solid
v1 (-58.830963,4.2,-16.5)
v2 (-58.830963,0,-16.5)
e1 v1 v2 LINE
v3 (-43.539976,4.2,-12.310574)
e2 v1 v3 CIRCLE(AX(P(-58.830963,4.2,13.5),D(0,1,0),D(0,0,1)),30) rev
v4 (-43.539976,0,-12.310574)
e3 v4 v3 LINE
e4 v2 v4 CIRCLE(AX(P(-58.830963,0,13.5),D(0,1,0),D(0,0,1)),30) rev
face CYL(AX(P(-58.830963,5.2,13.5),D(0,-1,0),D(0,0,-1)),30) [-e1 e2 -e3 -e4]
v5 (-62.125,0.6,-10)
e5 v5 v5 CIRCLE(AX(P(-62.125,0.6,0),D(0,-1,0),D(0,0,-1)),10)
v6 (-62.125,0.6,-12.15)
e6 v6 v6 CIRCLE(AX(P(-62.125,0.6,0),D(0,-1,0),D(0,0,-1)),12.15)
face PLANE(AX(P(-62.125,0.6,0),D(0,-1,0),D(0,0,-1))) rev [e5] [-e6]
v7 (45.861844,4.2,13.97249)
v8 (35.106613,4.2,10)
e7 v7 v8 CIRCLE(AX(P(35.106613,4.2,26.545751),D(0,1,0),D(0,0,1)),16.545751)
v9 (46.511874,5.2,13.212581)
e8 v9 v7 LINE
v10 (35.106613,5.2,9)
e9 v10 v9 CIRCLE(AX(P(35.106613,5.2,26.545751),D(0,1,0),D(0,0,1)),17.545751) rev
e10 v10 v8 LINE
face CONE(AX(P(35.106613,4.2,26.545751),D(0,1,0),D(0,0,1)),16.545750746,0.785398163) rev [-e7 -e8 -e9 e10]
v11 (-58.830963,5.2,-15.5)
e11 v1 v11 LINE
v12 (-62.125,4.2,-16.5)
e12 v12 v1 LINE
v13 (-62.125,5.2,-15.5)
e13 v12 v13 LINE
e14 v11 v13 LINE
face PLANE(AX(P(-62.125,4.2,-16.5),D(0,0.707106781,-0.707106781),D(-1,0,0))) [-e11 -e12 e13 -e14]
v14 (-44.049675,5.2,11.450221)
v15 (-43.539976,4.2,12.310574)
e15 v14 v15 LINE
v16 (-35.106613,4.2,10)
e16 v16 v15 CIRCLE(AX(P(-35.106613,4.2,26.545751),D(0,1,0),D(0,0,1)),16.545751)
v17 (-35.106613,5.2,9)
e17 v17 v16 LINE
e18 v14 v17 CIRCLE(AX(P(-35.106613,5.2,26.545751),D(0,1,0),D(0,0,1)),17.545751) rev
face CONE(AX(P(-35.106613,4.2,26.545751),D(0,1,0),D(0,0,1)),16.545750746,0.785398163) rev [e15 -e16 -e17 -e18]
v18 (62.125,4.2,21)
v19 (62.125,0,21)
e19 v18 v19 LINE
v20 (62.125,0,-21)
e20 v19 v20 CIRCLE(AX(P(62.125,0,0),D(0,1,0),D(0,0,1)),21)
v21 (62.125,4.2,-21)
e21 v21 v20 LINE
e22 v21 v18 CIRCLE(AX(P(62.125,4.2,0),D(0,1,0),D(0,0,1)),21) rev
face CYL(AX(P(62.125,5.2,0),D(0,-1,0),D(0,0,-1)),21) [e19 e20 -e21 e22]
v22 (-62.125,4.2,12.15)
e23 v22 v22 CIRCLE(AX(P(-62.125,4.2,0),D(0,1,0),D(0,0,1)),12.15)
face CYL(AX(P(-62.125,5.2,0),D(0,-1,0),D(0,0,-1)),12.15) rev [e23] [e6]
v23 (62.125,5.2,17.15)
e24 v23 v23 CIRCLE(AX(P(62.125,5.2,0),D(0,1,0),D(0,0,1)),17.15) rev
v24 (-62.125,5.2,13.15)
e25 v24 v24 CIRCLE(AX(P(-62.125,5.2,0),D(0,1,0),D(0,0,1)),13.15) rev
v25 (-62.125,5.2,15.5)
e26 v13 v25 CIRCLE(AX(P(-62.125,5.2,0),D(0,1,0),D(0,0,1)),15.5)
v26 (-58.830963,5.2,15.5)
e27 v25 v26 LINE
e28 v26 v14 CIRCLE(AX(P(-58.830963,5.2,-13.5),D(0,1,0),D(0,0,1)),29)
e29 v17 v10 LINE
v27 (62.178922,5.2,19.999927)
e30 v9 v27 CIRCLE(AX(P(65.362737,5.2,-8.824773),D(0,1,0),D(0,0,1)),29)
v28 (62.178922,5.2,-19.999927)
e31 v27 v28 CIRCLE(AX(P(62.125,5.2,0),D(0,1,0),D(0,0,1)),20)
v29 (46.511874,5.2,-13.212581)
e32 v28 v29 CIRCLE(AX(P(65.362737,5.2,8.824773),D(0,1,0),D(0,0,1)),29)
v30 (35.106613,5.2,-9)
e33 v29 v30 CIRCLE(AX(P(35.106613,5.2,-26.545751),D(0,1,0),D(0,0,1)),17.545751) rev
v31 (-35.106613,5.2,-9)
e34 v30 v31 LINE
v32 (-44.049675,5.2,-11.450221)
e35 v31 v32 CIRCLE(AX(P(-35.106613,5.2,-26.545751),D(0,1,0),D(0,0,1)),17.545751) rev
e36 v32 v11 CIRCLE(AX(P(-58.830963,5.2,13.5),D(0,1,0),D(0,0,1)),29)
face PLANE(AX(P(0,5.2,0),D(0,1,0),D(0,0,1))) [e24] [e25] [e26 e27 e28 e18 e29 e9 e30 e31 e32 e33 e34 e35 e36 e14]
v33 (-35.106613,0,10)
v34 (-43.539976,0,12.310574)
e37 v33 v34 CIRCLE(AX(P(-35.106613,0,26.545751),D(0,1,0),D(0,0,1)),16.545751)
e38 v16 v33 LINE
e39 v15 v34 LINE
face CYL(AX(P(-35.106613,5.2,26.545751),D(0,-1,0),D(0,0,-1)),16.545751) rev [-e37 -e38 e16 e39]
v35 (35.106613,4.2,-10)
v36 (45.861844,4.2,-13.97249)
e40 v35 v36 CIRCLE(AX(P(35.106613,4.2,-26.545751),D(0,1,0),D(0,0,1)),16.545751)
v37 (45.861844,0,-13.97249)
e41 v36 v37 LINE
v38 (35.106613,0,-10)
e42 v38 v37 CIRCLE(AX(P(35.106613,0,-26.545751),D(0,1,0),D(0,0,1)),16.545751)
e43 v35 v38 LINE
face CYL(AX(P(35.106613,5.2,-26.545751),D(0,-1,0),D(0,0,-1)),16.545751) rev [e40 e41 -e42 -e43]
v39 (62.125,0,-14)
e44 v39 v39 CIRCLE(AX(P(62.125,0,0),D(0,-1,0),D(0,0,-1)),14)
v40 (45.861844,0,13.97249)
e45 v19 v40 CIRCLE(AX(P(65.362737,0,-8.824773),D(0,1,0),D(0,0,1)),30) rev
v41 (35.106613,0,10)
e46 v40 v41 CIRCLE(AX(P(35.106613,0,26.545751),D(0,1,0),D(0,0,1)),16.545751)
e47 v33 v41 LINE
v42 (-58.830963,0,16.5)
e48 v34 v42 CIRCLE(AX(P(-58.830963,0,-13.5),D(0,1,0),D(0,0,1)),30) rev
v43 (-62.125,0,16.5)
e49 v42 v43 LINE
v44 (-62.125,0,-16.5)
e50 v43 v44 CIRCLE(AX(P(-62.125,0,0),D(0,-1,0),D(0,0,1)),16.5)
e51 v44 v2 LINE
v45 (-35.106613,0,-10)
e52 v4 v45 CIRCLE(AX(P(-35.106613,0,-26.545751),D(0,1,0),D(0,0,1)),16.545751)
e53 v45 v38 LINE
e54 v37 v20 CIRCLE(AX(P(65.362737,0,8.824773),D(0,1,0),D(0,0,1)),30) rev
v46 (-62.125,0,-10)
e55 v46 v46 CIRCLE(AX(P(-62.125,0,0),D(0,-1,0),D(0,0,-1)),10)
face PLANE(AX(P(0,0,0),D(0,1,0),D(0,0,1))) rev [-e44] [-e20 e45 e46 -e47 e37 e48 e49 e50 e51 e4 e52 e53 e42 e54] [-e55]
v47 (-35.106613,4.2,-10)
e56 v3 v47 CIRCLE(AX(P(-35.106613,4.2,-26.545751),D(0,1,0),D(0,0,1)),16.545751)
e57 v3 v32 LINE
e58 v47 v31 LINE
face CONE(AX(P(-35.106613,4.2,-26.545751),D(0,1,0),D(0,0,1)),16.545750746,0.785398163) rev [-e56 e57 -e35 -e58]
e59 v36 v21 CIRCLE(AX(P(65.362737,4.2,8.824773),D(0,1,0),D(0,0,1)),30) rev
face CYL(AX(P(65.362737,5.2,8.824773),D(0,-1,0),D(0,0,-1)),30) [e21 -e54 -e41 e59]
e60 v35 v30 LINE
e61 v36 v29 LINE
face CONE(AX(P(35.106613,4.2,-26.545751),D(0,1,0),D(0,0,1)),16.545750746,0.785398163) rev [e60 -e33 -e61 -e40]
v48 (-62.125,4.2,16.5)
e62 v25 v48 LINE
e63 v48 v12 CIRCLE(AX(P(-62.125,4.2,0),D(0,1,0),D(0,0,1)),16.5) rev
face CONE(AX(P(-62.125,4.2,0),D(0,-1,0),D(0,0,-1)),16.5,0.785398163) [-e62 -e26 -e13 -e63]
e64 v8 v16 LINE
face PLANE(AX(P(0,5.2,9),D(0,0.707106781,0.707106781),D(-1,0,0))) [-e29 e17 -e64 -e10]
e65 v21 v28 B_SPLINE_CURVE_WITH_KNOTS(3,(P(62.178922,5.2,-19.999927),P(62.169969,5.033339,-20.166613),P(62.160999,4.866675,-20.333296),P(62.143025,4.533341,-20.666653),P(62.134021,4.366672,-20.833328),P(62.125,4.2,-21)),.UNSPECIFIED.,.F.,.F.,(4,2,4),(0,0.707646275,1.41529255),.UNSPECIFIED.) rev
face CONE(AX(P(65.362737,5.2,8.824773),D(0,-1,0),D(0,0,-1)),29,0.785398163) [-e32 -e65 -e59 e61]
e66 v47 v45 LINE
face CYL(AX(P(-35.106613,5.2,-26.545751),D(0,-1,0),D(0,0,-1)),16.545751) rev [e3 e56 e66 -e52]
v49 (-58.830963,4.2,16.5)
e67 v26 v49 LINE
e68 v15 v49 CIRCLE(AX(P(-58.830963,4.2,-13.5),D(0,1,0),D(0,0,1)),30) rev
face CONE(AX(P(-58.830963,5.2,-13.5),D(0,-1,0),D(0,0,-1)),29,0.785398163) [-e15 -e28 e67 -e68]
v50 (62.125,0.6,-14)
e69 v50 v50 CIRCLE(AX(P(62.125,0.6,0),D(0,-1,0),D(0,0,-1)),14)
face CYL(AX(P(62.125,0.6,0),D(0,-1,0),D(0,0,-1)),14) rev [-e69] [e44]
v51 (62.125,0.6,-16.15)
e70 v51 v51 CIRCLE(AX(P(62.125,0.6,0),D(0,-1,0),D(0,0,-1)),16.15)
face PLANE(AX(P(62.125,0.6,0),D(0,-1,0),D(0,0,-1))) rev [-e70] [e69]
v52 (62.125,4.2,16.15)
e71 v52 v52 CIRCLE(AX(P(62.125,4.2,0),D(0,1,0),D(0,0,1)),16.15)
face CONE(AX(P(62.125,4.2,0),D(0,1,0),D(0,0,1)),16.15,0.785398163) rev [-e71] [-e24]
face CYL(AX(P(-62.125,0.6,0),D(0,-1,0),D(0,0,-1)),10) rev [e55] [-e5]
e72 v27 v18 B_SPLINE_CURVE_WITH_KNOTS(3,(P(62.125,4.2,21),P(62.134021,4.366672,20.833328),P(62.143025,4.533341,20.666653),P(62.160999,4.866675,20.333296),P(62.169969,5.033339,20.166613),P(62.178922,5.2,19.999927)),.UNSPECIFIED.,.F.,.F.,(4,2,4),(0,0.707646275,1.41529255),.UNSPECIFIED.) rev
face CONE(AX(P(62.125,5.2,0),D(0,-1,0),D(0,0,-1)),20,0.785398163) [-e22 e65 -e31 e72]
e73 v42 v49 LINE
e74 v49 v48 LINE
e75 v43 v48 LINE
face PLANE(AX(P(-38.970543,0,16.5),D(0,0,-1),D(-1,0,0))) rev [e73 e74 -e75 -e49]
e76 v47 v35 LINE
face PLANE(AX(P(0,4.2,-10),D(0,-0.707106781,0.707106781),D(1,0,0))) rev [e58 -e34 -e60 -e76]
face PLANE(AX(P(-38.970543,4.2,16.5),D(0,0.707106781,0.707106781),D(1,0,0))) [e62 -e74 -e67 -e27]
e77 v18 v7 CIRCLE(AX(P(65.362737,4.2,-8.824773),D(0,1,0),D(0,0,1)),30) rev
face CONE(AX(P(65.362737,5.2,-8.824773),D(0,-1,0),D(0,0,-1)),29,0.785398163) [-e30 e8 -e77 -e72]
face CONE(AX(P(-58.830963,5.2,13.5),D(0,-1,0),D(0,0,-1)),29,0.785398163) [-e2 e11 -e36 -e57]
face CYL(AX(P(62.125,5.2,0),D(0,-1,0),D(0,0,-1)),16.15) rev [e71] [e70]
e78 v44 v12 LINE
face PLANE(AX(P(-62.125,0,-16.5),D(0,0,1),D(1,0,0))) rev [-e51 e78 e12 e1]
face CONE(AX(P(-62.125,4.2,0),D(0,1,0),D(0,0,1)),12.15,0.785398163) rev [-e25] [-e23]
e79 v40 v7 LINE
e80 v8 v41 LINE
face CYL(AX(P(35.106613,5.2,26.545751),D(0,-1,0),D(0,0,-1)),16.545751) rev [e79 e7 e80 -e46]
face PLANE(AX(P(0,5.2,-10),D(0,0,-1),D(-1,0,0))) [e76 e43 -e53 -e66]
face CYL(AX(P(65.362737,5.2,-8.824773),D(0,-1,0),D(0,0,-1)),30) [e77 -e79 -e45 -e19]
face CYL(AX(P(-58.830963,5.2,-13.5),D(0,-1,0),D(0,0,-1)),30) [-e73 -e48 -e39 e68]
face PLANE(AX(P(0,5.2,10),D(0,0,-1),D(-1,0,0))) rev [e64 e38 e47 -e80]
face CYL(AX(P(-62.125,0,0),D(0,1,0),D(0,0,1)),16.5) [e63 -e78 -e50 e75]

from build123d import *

# Parameters (mm, degrees)
SKETCH1_R           = 12.15
SKETCH1_R_2         = 16.15
BOSS_EXTRUDE1_DEPTH = 5.2
CUT_EXTRUDE1_DEPTH  = 86.894153614
FILLET1_R           = 30
CHAMFER1_SIZE       = 1
SKETCH2_R           = 14.75534968
SKETCH2_R_2         = 10
SKETCH2_R_3         = 19.025242353
SKETCH2_R_4         = 14
BOSS_EXTRUDE2_DEPTH = 0.6


with BuildPart() as part:
    # Sketch1 → Boss-Extrude1 (new body)
    with BuildSketch(Plane(origin=(0, 0, 0), x_dir=(1, 0, 0), z_dir=(0, 1, 0))):
        with BuildLine():
            Line((50.6952797, -21), (62.125, -21))
            ThreePointArc((62.125, -21), (83.125, 0), (62.125, 21))
            Line((62.125, 21), (50.6952797, 21))
            ThreePointArc((50.6952797, 21), (44.646090821, 13.026866227), (35.106613419, 10))
            Line((35.106613419, 10), (-35.106613419, 10))
            ThreePointArc((-35.106613419, 10), (-44.646090821, 13.026866227), (-50.6952797, 21))
            Line((-50.6952797, 21), (-62.125, 21))
            ThreePointArc((-62.125, 21), (-83.125, 0), (-62.125, -21))
            Line((-62.125, -21), (-50.6952797, -21))
            ThreePointArc((-50.6952797, -21), (-44.646090821, -13.026866227), (-35.106613419, -10))
            Line((-35.106613419, -10), (35.106613419, -10))
            ThreePointArc((35.106613419, -10), (44.646090821, -13.026866227), (50.6952797, -21))
        make_face()
        with Locations(Location((-62.125, 0, 0), (0, 0, 270))):
            Circle(SKETCH1_R, mode=Mode.SUBTRACT)
        with Locations(Location((62.125, 0, 0), (0, 0, 270))):
            Circle(SKETCH1_R_2, mode=Mode.SUBTRACT)
    extrude(amount=BOSS_EXTRUDE1_DEPTH)

    # Sketch4 → Cut-Extrude1 (cut, through all)
    with BuildSketch(Plane(origin=(0, 5.2, 0), x_dir=(1, 0, 0), z_dir=(0, 1, 0))):
        with BuildLine():
            Line((-62.125, 16.5), (-40.410985901, 16.5))
            Line((-40.410985901, 16.5), (-43.407950199, 33.342917206))
            Line((-43.407950199, 33.342917206), (-92.984497382, 23.090976894))
            Line((-92.984497382, 23.090976894), (-92.984497382, -9.501012459))
            Line((-92.984497382, -9.501012459), (-86.710921967, -27.097626428))
            Line((-86.710921967, -27.097626428), (-50.736883487, -31.973137348))
            Line((-50.736883487, -31.973137348), (-37.899444956, -29.584754809))
            Line((-37.899444956, -29.584754809), (-38.970543198, -16.5))
            Line((-38.970543198, -16.5), (-62.125, -16.5))
            ThreePointArc((-62.125, -16.5), (-78.625, 0), (-62.125, 16.5))
        make_face()
    extrude(amount=-CUT_EXTRUDE1_DEPTH, mode=Mode.SUBTRACT)

    # Fillet1
    # the kernel refuses this fillet: 30 mm, written as the material it takes off along each edge
    with BuildSketch(Plane(origin=(50.6952797, -28.574300751, -21), x_dir=(1, 0, 0), z_dir=(0, 1, 0))) as fillet1_piece_1:
        with BuildLine():
            CenterArc((14.667456891, -29.824772619), FILLET1_R, 96.195688925, 34.34815674)
            ThreePointArc((-4.833435899, -7.027510056), (-1.956106094, -3.830558257), (0, 0))
            Line((0, 0), (11.4297203, 0))
        make_face()
    extrude(amount=62.348601502, mode=Mode.SUBTRACT)
    with BuildSketch(Plane(origin=(50.6952797, -28.574300751, 21), x_dir=(1, 0, 0), z_dir=(0, 1, 0))) as fillet1_piece_2:
        with BuildLine():
            CenterArc((14.667456891, 29.824772619), FILLET1_R, 229.456154336, 34.34815674)
            ThreePointArc((-4.833435899, 7.027510056), (-1.956106094, 3.830558257), (0, 0))
            Line((0, 0), (11.4297203, 0))
        make_face()
    extrude(amount=62.348601502, mode=Mode.SUBTRACT)
    with BuildSketch(Plane(origin=(-48.253657182, 31.64326437, -16.5), x_dir=(-1, 0, 0), z_dir=(0, -1, 0))) as fillet1_piece_3:
        with BuildLine():
            CenterArc((10.577305748, -30), FILLET1_R, 90, 30.643820853)
            ThreePointArc((-4.713681591, -4.189426465), (-2.15539677, -2.321365496), (0, 0))
            Line((0, 0), (10.577305748, 0))
        make_face()
    extrude(amount=58.086528739, mode=Mode.SUBTRACT)
    with BuildSketch(Plane(origin=(-48.253657182, 31.64326437, 16.5), x_dir=(0.7474496885574631, 0, -0.6643184199428399), z_dir=(0, -1, 0))) as fillet1_piece_4:
        with BuildLine():
            CenterArc((12.023548711, -29.450189698), FILLET1_R, 100.986236803, 30.643820853)
            Line((-7.906003887, -7.026699042), (0, 0))
            ThreePointArc((0, 0), (3.153176503, -0.30323414), (6.306353006, 0))
        make_face()
    extrude(amount=58.086528739, mode=Mode.SUBTRACT)

    # Chamfer1
    # the kernel refuses this chamfer: 1 mm, written as the material it takes off along each edge
    with BuildSketch(Plane(origin=(62.125, 5.2, 0), x_dir=(-0.12235070165055903, 0, 0.9924869297908239), z_dir=(-0.9924869297908239, 0, -0.12235070165055903))) as chamfer1_piece_1:
        Polygon((21, -CHAMFER1_SIZE), (21 - CHAMFER1_SIZE, 0), (21, 0), align=None)
    revolve(axis=Axis((62.125, 5.2, 0), (0, 1, 0)), revolution_arc=194.055575488, mode=Mode.SUBTRACT)
    with BuildSketch(Plane(origin=(35.106613419, 5.2, -26.545750746), x_dir=(0.6500297596931421, 0, 0.7599087520967739), z_dir=(0.7599087520967739, 0, -0.6500297596931421))) as chamfer1_piece_2:
        Polygon((16.545750746 + CHAMFER1_SIZE, 0), (16.545750746, CHAMFER1_SIZE), (16.545750746, 0), align=None)
    revolve(axis=Axis((35.106613419, 5.2, -26.545750746), (0, -1, 0)), revolution_arc=40.543845664, mode=Mode.SUBTRACT)
    with BuildSketch(Plane(origin=(35.106613419, 5.2, -10), x_dir=(0, 0, 1), z_dir=(-1, 0, 0)), Plane(origin=(-35.106613419, 5.2, 10), x_dir=(0, 0, -1), z_dir=(1, 0, 0))) as chamfer1_piece_3:
        Polygon((CHAMFER1_SIZE, 0), (0, -CHAMFER1_SIZE), (0, 0), align=None)
    extrude(amount=70.213226838, mode=Mode.SUBTRACT)
    with BuildSketch(Plane(origin=(-62.125, 5.2, 0), x_dir=(0, 0, 1), z_dir=(1, 0, 0))) as chamfer1_piece_4:
        Polygon((16.5 - CHAMFER1_SIZE, 0), (16.5, CHAMFER1_SIZE), (16.5, 0), align=None)
    revolve(axis=Axis((-62.125, 5.2, 0), (0, -1, 0)), revolution_arc=180, mode=Mode.SUBTRACT)
    with BuildSketch(Plane(origin=(-62.125, 5.2, -16.5), x_dir=(0, 0, 1), z_dir=(1, 0, 0)), Plane(origin=(-58.83096293, 5.2, 16.5), x_dir=(0, 0, -1), z_dir=(-1, 0, 0))) as chamfer1_piece_5:
        Polygon((CHAMFER1_SIZE, 0), (0, CHAMFER1_SIZE), (0, 0), align=None)
    extrude(amount=3.29403707, mode=Mode.SUBTRACT)
    with BuildSketch(Plane(origin=(-35.106613419, 5.2, 26.545750746), x_dir=(-0.5096995779497587, 0, -0.8603524511720982), z_dir=(-0.8603524511720982, 0, 0.5096995779497587))) as chamfer1_piece_6:
        Polygon((16.545750746 + CHAMFER1_SIZE, 0), (16.545750746, CHAMFER1_SIZE), (16.545750746, 0), align=None)
    revolve(axis=Axis((-35.106613419, 5.2, 26.545750746), (0, -1, 0)), revolution_arc=30.643820853, mode=Mode.SUBTRACT)
    with BuildSketch(Plane(origin=(-62.125, 5.2, 0), x_dir=(0, 0, 1), z_dir=(-1, 0, 0))) as chamfer1_piece_7:
        Polygon((12.15 + CHAMFER1_SIZE, 0), (12.15, -CHAMFER1_SIZE), (12.15, 0), align=None)
    revolve(axis=Axis((-62.125, 5.2, 0), (0, 1, 0)), mode=Mode.SUBTRACT)
    with BuildSketch(Plane(origin=(62.125, 5.2, 0), x_dir=(0, 0, 1), z_dir=(-1, 0, 0))) as chamfer1_piece_8:
        Polygon((16.15 + CHAMFER1_SIZE, 0), (16.15, -CHAMFER1_SIZE), (16.15, 0), align=None)
    revolve(axis=Axis((62.125, 5.2, 0), (0, 1, 0)), mode=Mode.SUBTRACT)
    with BuildSketch(Plane(origin=(-35.106613419, 5.2, -26.545750746), x_dir=(0, 0, 1), z_dir=(1, 0, 0))) as chamfer1_piece_9:
        Polygon((16.545750746 + CHAMFER1_SIZE, 0), (16.545750746, CHAMFER1_SIZE), (16.545750746, 0), align=None)
    revolve(axis=Axis((-35.106613419, 5.2, -26.545750746), (0, -1, 0)), revolution_arc=30.643820853, mode=Mode.SUBTRACT)
    with BuildSketch(Plane(origin=(35.106613419, 5.2, 26.545750746), x_dir=(0, 0, -1), z_dir=(-1, 0, 0))) as chamfer1_piece_10:
        Polygon((16.545750746 + CHAMFER1_SIZE, 0), (16.545750746, CHAMFER1_SIZE), (16.545750746, 0), align=None)
    revolve(axis=Axis((35.106613419, 5.2, 26.545750746), (0, -1, 0)), revolution_arc=40.543845664, mode=Mode.SUBTRACT)
    with BuildSketch(Plane(origin=(65.362736591, 5.2, -8.824772619), x_dir=(0.14849692395329253, 0, 0.9889128695574804), z_dir=(0.9889128695574804, 0, -0.14849692395329253))) as chamfer1_piece_11:
        Polygon((30, CHAMFER1_SIZE), (30 - CHAMFER1_SIZE, 0), (30, 0), align=None)
    revolve(axis=Axis((65.362736591, 5.2, -8.824772619), (0, -1, 0)), revolution_arc=49.083676808, mode=Mode.SUBTRACT)
    with BuildSketch(Plane(origin=(65.362736591, 5.2, 8.824772619), x_dir=(-0.6500297596931309, 0, -0.7599087520967833), z_dir=(-0.7599087520967833, 0, 0.6500297596931309))) as chamfer1_piece_12:
        Polygon((30, CHAMFER1_SIZE), (30 - CHAMFER1_SIZE, 0), (30, 0), align=None)
    revolve(axis=Axis((65.362736591, 5.2, 8.824772619), (0, -1, 0)), revolution_arc=49.083676808, mode=Mode.SUBTRACT)
    with BuildSketch(Plane(origin=(-58.83096293, 5.2, -13.5), x_dir=(0, 0, 1), z_dir=(-1, 0, 0))) as chamfer1_piece_13:
        Polygon((30 - CHAMFER1_SIZE, 0), (30, -CHAMFER1_SIZE), (30, 0), align=None)
    revolve(axis=Axis((-58.83096293, 5.2, -13.5), (0, 1, 0)), revolution_arc=30.643820853, mode=Mode.SUBTRACT)
    with BuildSketch(Plane(origin=(-58.83096293, 5.2, 13.5), x_dir=(0.5096995779497117, 0, -0.8603524511721262), z_dir=(0.8603524511721262, 0, 0.5096995779497117))) as chamfer1_piece_14:
        Polygon((30 - CHAMFER1_SIZE, 0), (30, -CHAMFER1_SIZE), (30, 0), align=None)
    revolve(axis=Axis((-58.83096293, 5.2, 13.5), (0, 1, 0)), revolution_arc=30.643820853, mode=Mode.SUBTRACT)

    # Sketch2 → Boss-Extrude2 (add)
    # profile 1 of 2: a face of its own
    with BuildSketch(Plane.XZ):
        with Locations((-62.125, 0)):
            Circle(SKETCH2_R)
        with Locations(Location((-62.125, 0, 0), (0, 0, 270))):
            Circle(SKETCH2_R_2, mode=Mode.SUBTRACT)
    # profile 2 of 2: a face of its own
    with BuildSketch(Plane.XZ):
        with Locations((62.125, 0)):
            Circle(SKETCH2_R_3)
        with Locations(Location((62.125, 0, 0), (0, 0, 270))):
            Circle(SKETCH2_R_4, mode=Mode.SUBTRACT)
    extrude(amount=-BOSS_EXTRUDE2_DEPTH)


solid = part.part
